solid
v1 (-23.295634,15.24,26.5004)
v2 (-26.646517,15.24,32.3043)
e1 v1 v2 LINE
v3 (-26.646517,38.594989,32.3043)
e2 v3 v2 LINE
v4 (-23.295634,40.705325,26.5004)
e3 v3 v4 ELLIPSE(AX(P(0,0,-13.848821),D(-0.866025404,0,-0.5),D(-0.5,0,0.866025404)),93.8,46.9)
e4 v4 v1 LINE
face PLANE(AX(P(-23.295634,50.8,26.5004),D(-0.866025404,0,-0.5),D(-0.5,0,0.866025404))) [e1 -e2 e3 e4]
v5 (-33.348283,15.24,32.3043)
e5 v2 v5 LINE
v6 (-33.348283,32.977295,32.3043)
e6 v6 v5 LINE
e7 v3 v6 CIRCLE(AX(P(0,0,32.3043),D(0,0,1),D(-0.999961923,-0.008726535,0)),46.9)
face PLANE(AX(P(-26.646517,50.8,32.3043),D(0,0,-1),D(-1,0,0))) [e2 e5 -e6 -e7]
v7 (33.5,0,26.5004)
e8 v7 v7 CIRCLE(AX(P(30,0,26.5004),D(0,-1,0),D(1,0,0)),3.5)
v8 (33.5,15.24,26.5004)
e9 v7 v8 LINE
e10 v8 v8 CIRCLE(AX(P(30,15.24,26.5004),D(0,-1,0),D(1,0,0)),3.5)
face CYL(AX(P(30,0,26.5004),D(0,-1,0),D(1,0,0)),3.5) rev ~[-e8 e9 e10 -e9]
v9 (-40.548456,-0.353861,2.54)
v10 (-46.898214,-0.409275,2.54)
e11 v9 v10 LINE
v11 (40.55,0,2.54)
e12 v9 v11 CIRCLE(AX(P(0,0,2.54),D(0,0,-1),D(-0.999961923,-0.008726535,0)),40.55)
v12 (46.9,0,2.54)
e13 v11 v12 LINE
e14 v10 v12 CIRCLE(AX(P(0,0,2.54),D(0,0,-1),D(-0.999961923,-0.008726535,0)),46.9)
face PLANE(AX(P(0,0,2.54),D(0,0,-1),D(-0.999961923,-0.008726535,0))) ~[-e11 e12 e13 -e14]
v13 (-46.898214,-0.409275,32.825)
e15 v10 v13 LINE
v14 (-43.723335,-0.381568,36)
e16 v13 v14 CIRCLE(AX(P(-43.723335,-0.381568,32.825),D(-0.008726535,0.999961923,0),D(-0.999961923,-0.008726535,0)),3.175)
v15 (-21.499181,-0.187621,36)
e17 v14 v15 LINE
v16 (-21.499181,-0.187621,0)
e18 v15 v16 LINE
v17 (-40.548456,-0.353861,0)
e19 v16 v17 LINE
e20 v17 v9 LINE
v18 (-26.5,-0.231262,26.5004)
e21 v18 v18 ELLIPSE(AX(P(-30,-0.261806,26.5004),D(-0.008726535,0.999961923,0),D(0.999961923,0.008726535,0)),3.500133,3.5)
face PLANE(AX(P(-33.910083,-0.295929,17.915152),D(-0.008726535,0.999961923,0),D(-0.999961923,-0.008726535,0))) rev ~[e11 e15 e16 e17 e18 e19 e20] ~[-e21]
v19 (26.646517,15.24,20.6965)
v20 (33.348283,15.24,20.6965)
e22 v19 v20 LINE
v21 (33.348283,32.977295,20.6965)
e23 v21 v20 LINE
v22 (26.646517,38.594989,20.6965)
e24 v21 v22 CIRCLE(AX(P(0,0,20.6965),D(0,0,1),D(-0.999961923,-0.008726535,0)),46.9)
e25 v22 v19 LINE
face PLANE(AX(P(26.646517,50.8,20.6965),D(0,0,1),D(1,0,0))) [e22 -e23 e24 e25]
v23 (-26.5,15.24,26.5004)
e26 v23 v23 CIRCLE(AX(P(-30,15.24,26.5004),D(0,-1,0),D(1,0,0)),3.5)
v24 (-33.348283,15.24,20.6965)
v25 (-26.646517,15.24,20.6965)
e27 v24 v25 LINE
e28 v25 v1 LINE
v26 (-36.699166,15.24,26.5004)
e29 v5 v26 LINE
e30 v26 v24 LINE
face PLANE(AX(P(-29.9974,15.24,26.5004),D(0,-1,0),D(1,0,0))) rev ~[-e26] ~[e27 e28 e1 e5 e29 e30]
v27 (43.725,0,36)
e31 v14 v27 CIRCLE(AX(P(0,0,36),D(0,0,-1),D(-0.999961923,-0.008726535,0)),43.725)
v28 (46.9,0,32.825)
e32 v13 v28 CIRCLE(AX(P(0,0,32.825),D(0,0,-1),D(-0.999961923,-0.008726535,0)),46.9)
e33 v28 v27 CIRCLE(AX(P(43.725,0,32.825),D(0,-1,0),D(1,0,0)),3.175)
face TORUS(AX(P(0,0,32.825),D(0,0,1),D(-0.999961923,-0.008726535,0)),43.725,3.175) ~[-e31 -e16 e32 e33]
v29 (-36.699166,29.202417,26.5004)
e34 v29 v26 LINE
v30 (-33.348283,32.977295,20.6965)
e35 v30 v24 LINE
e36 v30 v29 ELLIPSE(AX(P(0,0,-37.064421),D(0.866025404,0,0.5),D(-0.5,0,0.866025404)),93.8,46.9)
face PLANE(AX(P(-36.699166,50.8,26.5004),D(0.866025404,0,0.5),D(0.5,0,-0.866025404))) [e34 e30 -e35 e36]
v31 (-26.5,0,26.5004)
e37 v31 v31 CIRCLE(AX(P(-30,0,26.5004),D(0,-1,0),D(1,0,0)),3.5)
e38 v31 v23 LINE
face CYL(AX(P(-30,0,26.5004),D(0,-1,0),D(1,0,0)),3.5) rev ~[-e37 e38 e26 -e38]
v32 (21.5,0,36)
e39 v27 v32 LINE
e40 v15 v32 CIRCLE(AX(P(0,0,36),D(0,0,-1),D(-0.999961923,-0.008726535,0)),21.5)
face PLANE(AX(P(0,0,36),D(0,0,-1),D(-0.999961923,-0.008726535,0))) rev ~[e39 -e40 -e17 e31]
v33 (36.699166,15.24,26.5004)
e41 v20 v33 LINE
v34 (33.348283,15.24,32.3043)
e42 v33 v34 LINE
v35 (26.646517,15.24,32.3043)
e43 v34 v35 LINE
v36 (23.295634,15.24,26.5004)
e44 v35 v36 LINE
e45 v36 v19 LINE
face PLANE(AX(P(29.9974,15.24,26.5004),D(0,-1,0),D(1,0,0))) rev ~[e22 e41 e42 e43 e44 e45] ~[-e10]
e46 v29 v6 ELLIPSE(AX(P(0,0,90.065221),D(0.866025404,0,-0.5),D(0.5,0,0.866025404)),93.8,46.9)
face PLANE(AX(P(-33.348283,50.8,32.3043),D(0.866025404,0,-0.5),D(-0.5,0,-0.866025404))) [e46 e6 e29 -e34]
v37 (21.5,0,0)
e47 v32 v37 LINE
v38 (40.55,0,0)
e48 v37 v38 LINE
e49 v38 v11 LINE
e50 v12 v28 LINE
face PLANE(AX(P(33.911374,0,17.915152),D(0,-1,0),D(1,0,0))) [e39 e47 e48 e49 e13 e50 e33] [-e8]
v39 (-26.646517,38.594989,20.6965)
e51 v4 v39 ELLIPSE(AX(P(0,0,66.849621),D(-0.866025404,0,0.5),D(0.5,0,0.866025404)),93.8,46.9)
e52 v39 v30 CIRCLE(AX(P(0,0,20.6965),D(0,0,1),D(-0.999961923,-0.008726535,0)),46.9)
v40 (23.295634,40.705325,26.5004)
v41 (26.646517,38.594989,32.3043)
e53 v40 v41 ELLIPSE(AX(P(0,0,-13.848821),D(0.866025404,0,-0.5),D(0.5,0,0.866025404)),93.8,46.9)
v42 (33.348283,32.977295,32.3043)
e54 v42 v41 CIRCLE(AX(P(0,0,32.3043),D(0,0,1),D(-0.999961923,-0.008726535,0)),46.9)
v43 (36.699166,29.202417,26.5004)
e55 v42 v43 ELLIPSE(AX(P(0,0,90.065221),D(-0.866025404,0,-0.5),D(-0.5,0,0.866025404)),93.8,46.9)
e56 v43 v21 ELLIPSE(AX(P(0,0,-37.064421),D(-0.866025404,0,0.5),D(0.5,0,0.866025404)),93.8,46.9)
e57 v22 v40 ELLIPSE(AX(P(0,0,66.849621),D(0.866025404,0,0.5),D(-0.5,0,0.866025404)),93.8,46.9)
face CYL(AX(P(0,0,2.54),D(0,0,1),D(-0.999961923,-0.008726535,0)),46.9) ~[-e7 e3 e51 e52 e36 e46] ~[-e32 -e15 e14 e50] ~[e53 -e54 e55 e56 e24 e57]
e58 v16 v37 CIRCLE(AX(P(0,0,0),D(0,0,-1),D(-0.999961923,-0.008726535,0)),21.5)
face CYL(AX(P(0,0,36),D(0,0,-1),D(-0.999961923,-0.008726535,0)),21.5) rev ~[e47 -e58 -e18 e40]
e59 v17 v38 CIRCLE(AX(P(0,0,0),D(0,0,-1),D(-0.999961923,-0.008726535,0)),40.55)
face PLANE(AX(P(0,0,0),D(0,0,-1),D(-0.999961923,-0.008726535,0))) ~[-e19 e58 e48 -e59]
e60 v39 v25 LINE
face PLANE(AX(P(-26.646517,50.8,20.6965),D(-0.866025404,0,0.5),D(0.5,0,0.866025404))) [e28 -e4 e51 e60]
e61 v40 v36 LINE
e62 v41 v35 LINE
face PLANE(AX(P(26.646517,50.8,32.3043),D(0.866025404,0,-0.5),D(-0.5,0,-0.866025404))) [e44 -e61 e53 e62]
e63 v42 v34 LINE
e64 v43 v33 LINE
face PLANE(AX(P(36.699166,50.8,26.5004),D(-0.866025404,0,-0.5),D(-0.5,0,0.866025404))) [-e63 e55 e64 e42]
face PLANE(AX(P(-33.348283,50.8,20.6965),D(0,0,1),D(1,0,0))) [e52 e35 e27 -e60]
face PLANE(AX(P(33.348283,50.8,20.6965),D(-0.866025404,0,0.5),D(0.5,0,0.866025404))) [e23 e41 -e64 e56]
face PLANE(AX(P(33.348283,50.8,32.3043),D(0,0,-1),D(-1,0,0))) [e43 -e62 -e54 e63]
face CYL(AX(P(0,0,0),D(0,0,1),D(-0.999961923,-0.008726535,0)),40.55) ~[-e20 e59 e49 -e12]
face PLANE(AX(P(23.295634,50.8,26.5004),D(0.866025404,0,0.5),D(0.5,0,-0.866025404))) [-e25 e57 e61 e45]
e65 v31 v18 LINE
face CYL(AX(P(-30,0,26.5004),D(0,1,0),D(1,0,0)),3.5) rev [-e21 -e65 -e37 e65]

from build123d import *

# Parameters (mm, degrees)
F1_ANGLE_BACK = 180.5
F1_ANGLE      = 180.5
F2_R          = 3.5
F3_DEPTH      = 53.34
F3_DEPTH_BACK = 2.54
F6_DEPTH      = 35.56


# Not quite as in the source:
# - a feature names something its author has since deleted; it is built from what else it names


with BuildPart() as f1:
    # F0 (on Front) → F1 (revolve)
    with BuildSketch(Plane.XZ, mode=Mode.PRIVATE) as f1_sk:
        with BuildLine():
            Line((21.5, 36), (21.5, 0))
            Line((21.5, 0), (40.55, 0))
            Line((40.55, 0), (40.55, 2.54))
            Line((40.55, 2.54), (46.9, 2.54))
            Line((46.9, 2.54), (46.9, 32.825))
            ThreePointArc((46.9, 32.825), (45.9700640303, 35.0700640303), (43.725, 36))
            Line((43.725, 36), (21.5, 36))
        make_face()
    revolve(f1_sk.sketch.rotate(Axis((0, 0, -0.0018208164), (0, 0, -1)), -F1_ANGLE_BACK), axis=Axis((0, 0, -0.0018208164), (0, 0, -1)), revolution_arc=F1_ANGLE)

    # F2 (on Front) → F3 (cut, two sides)
    with BuildSketch(Plane.XZ) as f3_sk:
        with Locations((30, 26.5004)):
            Circle(F2_R)
        with Locations((-30, 26.5004)):
            Circle(F2_R)
    extrude(amount=-F3_DEPTH, mode=Mode.SUBTRACT)
    extrude(f3_sk.sketch, amount=F3_DEPTH_BACK, mode=Mode.SUBTRACT)

    # F5 (on offset) → F6 (cut)
    with BuildSketch(Plane.XZ.offset(-50.8)):
        Polygon((36.6991664547, 26.5004), (33.3482832273, 32.3043), (26.6465167727, 32.3043), (23.2956335453, 26.5004), (26.6465167727, 20.6965), (33.3482832273, 20.6965), align=None)
        Polygon((-33.3482832273, 32.3043), (-36.6991664547, 26.5004), (-33.3482832273, 20.6965), (-26.6465167727, 20.6965), (-23.2956335453, 26.5004), (-26.6465167727, 32.3043), align=None)
    extrude(amount=F6_DEPTH, mode=Mode.SUBTRACT)


solid = f1.part
